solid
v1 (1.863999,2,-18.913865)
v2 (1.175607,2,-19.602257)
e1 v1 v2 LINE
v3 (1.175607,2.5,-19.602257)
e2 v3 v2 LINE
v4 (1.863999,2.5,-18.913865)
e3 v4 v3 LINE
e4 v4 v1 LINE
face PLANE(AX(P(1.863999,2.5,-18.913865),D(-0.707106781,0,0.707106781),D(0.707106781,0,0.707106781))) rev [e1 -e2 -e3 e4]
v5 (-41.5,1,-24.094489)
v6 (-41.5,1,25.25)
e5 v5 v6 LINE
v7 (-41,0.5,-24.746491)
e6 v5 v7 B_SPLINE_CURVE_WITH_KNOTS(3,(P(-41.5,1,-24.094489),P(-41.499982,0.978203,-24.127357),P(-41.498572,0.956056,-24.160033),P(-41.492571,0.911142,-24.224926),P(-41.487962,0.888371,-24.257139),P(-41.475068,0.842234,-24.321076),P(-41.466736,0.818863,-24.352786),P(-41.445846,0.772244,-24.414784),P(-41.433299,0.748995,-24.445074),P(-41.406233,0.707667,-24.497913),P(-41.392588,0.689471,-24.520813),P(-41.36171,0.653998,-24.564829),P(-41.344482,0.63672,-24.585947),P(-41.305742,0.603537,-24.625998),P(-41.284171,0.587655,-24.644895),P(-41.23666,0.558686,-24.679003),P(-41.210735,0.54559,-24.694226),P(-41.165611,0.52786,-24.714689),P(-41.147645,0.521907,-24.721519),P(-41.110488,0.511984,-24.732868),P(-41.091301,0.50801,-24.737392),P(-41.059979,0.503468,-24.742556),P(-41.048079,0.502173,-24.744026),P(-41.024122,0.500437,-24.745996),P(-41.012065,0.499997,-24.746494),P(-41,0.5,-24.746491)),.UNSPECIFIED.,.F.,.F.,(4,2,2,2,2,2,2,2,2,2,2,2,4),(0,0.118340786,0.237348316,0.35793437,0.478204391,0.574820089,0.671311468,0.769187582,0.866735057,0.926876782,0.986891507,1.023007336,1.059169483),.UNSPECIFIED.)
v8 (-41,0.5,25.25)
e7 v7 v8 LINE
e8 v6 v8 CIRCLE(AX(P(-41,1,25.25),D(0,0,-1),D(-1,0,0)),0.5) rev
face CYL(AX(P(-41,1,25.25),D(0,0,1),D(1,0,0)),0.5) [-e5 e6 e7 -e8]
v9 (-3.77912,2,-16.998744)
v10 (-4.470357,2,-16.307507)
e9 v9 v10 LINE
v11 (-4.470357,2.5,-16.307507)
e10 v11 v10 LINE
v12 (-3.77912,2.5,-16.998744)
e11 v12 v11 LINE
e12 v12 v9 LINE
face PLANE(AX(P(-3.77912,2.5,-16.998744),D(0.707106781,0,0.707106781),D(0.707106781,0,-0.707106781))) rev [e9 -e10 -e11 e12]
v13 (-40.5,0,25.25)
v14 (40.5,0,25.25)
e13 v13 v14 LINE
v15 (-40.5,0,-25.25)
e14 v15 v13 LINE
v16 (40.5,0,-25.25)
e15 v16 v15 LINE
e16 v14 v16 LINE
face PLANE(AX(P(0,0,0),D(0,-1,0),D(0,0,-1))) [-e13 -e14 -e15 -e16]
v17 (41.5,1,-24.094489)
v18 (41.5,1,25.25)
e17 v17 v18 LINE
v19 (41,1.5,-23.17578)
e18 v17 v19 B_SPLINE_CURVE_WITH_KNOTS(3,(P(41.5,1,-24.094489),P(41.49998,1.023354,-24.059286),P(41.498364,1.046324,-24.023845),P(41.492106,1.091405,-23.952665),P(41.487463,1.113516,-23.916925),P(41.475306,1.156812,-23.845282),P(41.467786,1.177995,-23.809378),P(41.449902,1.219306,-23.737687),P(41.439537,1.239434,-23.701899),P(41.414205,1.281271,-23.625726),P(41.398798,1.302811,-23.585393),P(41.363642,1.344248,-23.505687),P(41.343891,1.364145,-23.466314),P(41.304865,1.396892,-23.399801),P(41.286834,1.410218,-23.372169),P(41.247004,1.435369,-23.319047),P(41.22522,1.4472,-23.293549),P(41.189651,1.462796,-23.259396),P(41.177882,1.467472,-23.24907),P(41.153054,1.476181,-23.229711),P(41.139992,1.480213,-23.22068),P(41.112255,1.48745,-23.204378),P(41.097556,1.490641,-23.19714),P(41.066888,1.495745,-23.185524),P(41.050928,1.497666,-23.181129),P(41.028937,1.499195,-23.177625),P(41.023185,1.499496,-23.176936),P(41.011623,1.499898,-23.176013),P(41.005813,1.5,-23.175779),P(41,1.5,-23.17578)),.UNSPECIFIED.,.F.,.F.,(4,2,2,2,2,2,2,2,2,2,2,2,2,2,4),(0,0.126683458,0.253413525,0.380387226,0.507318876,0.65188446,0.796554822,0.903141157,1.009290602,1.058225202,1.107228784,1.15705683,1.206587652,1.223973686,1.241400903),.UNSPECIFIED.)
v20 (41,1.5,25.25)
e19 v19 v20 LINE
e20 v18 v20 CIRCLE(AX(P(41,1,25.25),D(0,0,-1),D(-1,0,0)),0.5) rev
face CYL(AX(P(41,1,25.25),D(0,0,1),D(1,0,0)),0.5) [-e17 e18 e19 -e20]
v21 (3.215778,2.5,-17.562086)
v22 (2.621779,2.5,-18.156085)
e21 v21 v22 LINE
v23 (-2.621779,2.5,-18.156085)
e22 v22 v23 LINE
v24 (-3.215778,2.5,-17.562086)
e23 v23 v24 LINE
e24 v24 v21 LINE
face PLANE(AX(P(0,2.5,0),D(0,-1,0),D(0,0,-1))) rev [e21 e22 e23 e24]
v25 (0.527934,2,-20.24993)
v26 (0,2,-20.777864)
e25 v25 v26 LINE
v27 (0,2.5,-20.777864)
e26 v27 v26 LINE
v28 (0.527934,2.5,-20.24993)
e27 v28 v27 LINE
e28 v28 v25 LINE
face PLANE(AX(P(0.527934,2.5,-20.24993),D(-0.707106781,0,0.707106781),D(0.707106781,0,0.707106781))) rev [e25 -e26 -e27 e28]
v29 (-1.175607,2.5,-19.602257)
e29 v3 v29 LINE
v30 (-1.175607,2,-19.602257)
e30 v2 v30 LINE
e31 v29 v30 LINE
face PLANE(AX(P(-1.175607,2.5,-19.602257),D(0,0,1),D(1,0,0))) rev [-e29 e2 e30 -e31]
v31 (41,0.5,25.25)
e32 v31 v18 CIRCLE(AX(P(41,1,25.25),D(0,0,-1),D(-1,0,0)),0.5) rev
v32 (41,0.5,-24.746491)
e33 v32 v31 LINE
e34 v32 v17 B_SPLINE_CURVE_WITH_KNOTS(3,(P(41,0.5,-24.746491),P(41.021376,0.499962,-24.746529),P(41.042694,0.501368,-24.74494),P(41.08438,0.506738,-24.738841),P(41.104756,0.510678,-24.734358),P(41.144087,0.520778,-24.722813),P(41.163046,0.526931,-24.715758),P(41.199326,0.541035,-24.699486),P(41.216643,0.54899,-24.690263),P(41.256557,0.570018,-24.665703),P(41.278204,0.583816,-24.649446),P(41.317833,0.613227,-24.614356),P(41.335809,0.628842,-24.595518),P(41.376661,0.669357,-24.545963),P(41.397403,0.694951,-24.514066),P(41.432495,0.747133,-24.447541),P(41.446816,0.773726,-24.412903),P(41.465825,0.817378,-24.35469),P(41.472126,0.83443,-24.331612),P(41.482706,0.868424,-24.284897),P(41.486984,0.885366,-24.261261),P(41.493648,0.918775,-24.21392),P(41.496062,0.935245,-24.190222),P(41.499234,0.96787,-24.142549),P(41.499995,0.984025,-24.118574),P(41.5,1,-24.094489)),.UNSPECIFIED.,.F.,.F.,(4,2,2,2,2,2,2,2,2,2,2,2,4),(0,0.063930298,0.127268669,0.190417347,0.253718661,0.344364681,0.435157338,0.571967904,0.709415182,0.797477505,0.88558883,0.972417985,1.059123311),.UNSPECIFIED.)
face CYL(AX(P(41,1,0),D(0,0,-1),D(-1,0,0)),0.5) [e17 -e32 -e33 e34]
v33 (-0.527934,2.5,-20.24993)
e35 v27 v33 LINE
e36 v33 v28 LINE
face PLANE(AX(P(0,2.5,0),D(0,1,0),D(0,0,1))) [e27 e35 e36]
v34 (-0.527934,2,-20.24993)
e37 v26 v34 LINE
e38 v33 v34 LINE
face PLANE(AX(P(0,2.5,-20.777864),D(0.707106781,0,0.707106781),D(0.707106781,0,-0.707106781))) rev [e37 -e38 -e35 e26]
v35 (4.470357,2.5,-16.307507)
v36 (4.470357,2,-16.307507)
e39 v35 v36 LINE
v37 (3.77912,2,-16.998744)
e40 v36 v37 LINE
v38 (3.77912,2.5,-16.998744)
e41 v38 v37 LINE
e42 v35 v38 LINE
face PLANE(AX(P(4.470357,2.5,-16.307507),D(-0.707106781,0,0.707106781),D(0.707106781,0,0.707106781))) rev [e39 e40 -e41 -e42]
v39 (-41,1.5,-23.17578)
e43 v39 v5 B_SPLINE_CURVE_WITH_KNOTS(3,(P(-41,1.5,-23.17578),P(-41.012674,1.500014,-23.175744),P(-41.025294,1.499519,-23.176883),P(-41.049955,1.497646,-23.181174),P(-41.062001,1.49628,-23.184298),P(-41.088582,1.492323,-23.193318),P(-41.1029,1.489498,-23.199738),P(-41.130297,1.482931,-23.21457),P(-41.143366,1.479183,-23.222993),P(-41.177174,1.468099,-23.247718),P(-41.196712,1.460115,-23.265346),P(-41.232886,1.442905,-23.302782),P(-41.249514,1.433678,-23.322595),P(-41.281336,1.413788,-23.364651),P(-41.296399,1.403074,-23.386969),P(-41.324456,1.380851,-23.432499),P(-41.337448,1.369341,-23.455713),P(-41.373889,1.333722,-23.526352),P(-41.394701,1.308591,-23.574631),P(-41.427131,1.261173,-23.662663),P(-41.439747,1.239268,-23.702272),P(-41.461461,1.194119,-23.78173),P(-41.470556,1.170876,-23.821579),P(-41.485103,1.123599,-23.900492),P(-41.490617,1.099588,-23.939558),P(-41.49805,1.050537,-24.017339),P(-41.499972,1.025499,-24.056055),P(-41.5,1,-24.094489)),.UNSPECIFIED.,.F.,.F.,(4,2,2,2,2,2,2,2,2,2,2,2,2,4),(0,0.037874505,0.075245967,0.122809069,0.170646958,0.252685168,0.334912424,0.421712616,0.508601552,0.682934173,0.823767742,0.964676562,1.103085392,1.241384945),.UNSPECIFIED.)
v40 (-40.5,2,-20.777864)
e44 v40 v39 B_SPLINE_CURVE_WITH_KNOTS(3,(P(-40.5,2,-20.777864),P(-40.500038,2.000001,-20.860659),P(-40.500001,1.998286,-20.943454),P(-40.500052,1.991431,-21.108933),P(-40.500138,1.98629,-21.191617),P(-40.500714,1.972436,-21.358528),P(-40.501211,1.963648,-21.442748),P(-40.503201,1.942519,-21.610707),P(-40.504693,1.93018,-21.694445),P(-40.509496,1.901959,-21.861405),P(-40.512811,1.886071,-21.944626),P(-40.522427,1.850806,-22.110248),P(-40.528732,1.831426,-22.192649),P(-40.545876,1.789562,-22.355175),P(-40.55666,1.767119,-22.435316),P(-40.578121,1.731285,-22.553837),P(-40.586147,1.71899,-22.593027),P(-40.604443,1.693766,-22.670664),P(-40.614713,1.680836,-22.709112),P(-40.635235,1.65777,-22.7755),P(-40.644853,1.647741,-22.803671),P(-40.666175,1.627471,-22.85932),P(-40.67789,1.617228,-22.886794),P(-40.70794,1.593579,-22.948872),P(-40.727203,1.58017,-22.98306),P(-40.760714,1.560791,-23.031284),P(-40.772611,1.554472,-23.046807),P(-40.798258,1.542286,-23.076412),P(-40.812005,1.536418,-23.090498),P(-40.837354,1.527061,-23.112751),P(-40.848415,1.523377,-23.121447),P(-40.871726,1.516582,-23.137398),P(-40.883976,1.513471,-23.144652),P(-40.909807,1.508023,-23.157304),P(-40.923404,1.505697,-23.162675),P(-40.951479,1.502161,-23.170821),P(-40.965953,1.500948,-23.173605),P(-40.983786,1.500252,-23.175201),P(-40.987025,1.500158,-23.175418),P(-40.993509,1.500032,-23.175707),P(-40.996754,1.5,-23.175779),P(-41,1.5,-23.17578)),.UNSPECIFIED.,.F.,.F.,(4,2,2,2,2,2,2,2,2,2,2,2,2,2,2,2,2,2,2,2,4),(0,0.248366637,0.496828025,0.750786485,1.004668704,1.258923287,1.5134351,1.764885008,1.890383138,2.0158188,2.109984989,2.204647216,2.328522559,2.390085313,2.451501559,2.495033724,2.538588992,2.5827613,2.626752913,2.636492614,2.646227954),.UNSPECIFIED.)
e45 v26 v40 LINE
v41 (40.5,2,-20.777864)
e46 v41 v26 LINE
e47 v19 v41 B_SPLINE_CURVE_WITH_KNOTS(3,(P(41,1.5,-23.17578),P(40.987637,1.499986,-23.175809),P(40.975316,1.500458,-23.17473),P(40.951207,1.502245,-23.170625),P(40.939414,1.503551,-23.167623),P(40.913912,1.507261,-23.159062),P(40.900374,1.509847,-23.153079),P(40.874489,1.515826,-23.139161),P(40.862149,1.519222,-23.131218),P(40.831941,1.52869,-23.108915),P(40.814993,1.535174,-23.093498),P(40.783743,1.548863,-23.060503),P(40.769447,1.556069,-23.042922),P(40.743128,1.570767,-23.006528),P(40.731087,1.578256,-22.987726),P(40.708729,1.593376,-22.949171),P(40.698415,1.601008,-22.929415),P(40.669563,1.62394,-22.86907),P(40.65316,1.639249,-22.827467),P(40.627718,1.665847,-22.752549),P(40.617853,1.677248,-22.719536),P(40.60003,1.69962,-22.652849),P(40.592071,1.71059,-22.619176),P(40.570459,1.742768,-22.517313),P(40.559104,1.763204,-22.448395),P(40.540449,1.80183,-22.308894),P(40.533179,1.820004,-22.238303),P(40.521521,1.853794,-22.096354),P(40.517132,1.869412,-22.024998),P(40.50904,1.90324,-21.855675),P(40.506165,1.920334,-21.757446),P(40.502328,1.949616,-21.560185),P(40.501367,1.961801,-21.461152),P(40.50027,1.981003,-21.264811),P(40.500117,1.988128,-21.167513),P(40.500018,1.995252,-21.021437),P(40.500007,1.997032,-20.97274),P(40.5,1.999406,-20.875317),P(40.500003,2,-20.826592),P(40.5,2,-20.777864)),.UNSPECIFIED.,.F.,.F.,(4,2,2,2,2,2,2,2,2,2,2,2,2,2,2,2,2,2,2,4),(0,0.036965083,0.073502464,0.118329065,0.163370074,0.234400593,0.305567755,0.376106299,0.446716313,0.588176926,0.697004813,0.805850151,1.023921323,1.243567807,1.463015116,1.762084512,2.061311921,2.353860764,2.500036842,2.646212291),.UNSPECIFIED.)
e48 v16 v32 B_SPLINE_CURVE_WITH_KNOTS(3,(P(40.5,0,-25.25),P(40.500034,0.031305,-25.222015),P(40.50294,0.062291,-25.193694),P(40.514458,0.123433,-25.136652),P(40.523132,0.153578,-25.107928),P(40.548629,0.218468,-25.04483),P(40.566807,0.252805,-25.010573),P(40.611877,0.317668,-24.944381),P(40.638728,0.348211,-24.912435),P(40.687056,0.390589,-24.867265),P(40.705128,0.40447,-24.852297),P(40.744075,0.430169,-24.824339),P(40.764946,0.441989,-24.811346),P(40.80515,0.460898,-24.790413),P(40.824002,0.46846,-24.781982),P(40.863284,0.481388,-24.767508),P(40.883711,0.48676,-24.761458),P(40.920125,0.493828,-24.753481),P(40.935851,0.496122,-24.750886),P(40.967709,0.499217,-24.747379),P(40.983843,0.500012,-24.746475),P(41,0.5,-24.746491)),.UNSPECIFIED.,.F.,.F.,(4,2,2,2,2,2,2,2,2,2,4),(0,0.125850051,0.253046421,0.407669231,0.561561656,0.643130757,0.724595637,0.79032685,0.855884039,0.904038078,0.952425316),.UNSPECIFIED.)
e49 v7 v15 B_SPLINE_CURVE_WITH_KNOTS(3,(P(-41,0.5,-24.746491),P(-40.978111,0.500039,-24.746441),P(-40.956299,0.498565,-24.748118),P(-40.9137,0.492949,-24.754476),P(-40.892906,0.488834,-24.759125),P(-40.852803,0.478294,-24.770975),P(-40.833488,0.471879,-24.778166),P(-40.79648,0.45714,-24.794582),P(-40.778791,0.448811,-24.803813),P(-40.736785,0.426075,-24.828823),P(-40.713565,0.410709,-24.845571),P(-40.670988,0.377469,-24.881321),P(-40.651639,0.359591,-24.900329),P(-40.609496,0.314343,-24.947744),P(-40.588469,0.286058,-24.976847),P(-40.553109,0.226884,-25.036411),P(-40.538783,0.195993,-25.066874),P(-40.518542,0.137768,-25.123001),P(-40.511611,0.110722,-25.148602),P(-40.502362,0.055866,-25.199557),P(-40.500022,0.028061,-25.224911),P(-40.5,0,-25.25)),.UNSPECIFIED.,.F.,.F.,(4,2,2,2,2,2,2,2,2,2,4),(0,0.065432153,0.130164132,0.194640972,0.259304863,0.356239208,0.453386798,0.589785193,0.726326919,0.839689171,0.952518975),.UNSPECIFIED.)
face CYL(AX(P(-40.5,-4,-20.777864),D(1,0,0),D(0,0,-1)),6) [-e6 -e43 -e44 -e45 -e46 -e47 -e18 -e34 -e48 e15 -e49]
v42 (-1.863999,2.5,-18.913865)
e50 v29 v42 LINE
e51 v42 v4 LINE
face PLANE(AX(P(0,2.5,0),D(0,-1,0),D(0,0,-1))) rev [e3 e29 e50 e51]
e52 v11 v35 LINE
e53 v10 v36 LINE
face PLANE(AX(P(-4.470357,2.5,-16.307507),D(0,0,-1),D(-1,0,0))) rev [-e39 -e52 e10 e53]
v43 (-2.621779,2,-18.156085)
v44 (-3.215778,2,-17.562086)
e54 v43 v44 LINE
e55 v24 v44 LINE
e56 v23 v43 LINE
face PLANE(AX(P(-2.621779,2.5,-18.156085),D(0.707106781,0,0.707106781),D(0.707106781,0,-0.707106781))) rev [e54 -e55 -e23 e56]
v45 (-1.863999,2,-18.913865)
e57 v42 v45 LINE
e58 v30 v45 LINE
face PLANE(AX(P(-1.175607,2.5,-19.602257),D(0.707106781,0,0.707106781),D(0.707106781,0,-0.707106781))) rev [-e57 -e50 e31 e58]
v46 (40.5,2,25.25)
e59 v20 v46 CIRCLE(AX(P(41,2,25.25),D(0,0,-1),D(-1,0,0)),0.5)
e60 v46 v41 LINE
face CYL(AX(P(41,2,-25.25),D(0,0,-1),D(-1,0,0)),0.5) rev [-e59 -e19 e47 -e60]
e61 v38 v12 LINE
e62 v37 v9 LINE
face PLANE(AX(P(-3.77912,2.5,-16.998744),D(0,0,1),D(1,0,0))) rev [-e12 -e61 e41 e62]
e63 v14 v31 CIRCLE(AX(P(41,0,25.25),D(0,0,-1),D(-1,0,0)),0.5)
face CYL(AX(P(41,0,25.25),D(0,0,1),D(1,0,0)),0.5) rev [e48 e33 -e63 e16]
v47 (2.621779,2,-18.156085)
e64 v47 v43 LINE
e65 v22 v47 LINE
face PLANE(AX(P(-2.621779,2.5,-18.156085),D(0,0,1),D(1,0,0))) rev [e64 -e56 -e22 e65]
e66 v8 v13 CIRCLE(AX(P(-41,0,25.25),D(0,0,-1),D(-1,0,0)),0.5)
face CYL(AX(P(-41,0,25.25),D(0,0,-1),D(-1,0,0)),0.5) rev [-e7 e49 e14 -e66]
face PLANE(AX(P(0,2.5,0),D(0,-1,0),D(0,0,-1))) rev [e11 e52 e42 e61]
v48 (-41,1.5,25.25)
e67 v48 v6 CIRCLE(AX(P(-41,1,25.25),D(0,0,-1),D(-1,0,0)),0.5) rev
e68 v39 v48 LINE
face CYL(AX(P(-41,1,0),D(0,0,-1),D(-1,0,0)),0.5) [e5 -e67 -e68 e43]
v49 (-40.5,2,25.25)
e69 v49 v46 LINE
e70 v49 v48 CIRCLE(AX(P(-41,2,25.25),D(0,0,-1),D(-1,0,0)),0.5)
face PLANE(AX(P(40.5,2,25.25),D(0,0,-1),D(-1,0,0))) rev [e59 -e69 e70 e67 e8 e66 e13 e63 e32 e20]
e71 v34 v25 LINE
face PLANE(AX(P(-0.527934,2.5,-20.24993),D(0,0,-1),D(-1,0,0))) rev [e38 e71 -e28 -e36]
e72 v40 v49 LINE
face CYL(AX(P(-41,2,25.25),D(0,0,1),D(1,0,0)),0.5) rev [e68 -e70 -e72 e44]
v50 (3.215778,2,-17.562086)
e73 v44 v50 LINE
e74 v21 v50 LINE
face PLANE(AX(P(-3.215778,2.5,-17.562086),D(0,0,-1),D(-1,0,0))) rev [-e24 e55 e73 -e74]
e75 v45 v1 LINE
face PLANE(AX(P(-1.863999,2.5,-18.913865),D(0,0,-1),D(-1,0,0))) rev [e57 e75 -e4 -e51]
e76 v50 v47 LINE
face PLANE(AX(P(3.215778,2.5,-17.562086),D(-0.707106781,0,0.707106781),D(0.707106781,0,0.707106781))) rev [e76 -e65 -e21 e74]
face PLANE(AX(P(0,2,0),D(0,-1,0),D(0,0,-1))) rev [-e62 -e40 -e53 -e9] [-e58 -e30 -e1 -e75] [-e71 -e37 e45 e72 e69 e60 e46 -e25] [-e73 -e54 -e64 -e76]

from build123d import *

# Parameters (mm, degrees)
SKETCH1_W           = 81
SKETCH1_H           = 50.5
BOSS_EXTRUDE1_DEPTH = 2
SKETCH2_W           = 50.5
SKETCH2_H           = 1
EXTRUDE_THIN1_DEPTH = 1
FILLET4_START       = -26
FILLET4_DEPTH       = 52
FILLET4_START_2     = -25.25
FILLET4_2_DEPTH     = 50.5
FILLET8_R           = 6
BOSS_EXTRUDE2_DEPTH = 0.5


with BuildPart() as part:
    # Sketch1 → Boss-Extrude1 (new body)
    with BuildSketch(Plane(origin=(0, 0, 0), x_dir=(1, 0, 0), z_dir=(0, 1, 0))):
        Rectangle(SKETCH1_W, SKETCH1_H)
    extrude(amount=BOSS_EXTRUDE1_DEPTH)

    # Sketch2 → Extrude-Thin1 (add)
    with BuildSketch(Plane(origin=(40.5, 0, 0), x_dir=(0, 0, -1), z_dir=(1, 0, 0))):
        with Locations((0, 1)):
            Rectangle(SKETCH2_W, SKETCH2_H)
    extrude_thin1 = extrude(amount=EXTRUDE_THIN1_DEPTH)

    # Mirror1: Extrude-Thin1 across plane
    add(extrude_thin1.mirror(Plane(origin=(0, 0, 0), x_dir=(0, 0, 1), z_dir=(1, 0, 0))))

    # Fillet4: read off the stored shape, not the designer's step
    # Fillet4 outline → Fillet4 (cut)
    with BuildSketch(Plane.XY.offset(FILLET4_START)):
        with BuildLine():
            Line((-41.5, 0.5), (-41, 0.5))
            ThreePointArc((-41, 0.5), (-41.353553391, 0.646446609), (-41.5, 1))
            Line((-41.5, 1), (-41.5, 0.5))
        make_face()
        with BuildLine():
            Line((-41.5, 1.5), (-41.5, 1))
            ThreePointArc((-41.5, 1), (-41.353553391, 1.353553391), (-41, 1.5))
            Line((-41, 1.5), (-41.5, 1.5))
        make_face()
        with BuildLine():
            Line((41.5, 1.5), (41, 1.5))
            ThreePointArc((41, 1.5), (41.353553391, 1.353553391), (41.5, 1))
            Line((41.5, 1), (41.5, 1.5))
        make_face()
        with BuildLine():
            Line((41.5, 0.5), (41.5, 1))
            ThreePointArc((41.5, 1), (41.353553391, 0.646446609), (41, 0.5))
            Line((41, 0.5), (41.5, 0.5))
        make_face()
    extrude(amount=FILLET4_DEPTH, mode=Mode.SUBTRACT)

    # Fillet4 2 outline → Fillet4 2 (add)
    with BuildSketch(Plane.XY.offset(FILLET4_START_2)):
        with BuildLine():
            Line((-40.5, 0.5), (-41, 0.5))
            ThreePointArc((-41, 0.5), (-40.646446609, 0.353553391), (-40.5, 0))
            Line((-40.5, 0), (-40.5, 0.5))
        make_face()
        with BuildLine():
            ThreePointArc((-40.5, 2), (-40.646446609, 1.646446609), (-41, 1.5))
            Line((-41, 1.5), (-40.5, 1.5))
            Line((-40.5, 1.5), (-40.5, 2))
        make_face()
        with BuildLine():
            Line((40.5, 1.5), (41, 1.5))
            ThreePointArc((41, 1.5), (40.646446609, 1.646446609), (40.5, 2))
            Line((40.5, 2), (40.5, 1.5))
        make_face()
        with BuildLine():
            ThreePointArc((40.5, 0), (40.646446609, 0.353553391), (41, 0.5))
            Line((41, 0.5), (40.5, 0.5))
            Line((40.5, 0.5), (40.5, 0))
        make_face()
    extrude(amount=FILLET4_2_DEPTH)

    # Fillet8
    # the kernel refuses this fillet: 6 mm, written as the material it takes off along each edge
    with BuildSketch(Plane(origin=(-51.680339887, 2, -25.25), x_dir=(0, -1, 0), z_dir=(1, 0, 0))) as fillet8_piece_1:
        with BuildLine():
            CenterArc((6, -4.472135955), FILLET8_R, 131.810314896, 48.189685104)
            Line((0, -4.472135955), (-0.12, -4.472135955))
            Line((-0.12, -4.472135955), (-0.12, 0))
            Line((-0.12, 0), (0, 0.12))
            ThreePointArc((0, 0.12), (1, 0.12), (1.92, 0.089442719))
            Line((1.92, 0.089442719), (2, 0))
        make_face()
    extrude(amount=103.360679775, mode=Mode.SUBTRACT)

    # Sketch3 → Boss-Extrude2 (add)
    with BuildSketch(Plane(origin=(0, 2, 0), x_dir=(1, 0, 0), z_dir=(0, 1, 0))):
        Polygon((0, 20.777864045), (-0.527934032, 20.249930013), (0.527934032, 20.249930013), align=None)
        Polygon((-4.470357419, 16.307506626), (4.470357419, 16.307506626), (3.779119733, 16.998744312), (-3.779119733, 16.998744312), align=None)
        Polygon((-1.175607402, 19.602256643), (1.175607402, 19.602256643), (1.863999283, 18.913864762), (-1.863999283, 18.913864762), align=None)
        Polygon((-2.621779089, 18.156084956), (2.621779089, 18.156084956), (3.215777687, 17.562086358), (-3.215777687, 17.562086358), align=None)
    extrude(amount=BOSS_EXTRUDE2_DEPTH)


solid = part.part
